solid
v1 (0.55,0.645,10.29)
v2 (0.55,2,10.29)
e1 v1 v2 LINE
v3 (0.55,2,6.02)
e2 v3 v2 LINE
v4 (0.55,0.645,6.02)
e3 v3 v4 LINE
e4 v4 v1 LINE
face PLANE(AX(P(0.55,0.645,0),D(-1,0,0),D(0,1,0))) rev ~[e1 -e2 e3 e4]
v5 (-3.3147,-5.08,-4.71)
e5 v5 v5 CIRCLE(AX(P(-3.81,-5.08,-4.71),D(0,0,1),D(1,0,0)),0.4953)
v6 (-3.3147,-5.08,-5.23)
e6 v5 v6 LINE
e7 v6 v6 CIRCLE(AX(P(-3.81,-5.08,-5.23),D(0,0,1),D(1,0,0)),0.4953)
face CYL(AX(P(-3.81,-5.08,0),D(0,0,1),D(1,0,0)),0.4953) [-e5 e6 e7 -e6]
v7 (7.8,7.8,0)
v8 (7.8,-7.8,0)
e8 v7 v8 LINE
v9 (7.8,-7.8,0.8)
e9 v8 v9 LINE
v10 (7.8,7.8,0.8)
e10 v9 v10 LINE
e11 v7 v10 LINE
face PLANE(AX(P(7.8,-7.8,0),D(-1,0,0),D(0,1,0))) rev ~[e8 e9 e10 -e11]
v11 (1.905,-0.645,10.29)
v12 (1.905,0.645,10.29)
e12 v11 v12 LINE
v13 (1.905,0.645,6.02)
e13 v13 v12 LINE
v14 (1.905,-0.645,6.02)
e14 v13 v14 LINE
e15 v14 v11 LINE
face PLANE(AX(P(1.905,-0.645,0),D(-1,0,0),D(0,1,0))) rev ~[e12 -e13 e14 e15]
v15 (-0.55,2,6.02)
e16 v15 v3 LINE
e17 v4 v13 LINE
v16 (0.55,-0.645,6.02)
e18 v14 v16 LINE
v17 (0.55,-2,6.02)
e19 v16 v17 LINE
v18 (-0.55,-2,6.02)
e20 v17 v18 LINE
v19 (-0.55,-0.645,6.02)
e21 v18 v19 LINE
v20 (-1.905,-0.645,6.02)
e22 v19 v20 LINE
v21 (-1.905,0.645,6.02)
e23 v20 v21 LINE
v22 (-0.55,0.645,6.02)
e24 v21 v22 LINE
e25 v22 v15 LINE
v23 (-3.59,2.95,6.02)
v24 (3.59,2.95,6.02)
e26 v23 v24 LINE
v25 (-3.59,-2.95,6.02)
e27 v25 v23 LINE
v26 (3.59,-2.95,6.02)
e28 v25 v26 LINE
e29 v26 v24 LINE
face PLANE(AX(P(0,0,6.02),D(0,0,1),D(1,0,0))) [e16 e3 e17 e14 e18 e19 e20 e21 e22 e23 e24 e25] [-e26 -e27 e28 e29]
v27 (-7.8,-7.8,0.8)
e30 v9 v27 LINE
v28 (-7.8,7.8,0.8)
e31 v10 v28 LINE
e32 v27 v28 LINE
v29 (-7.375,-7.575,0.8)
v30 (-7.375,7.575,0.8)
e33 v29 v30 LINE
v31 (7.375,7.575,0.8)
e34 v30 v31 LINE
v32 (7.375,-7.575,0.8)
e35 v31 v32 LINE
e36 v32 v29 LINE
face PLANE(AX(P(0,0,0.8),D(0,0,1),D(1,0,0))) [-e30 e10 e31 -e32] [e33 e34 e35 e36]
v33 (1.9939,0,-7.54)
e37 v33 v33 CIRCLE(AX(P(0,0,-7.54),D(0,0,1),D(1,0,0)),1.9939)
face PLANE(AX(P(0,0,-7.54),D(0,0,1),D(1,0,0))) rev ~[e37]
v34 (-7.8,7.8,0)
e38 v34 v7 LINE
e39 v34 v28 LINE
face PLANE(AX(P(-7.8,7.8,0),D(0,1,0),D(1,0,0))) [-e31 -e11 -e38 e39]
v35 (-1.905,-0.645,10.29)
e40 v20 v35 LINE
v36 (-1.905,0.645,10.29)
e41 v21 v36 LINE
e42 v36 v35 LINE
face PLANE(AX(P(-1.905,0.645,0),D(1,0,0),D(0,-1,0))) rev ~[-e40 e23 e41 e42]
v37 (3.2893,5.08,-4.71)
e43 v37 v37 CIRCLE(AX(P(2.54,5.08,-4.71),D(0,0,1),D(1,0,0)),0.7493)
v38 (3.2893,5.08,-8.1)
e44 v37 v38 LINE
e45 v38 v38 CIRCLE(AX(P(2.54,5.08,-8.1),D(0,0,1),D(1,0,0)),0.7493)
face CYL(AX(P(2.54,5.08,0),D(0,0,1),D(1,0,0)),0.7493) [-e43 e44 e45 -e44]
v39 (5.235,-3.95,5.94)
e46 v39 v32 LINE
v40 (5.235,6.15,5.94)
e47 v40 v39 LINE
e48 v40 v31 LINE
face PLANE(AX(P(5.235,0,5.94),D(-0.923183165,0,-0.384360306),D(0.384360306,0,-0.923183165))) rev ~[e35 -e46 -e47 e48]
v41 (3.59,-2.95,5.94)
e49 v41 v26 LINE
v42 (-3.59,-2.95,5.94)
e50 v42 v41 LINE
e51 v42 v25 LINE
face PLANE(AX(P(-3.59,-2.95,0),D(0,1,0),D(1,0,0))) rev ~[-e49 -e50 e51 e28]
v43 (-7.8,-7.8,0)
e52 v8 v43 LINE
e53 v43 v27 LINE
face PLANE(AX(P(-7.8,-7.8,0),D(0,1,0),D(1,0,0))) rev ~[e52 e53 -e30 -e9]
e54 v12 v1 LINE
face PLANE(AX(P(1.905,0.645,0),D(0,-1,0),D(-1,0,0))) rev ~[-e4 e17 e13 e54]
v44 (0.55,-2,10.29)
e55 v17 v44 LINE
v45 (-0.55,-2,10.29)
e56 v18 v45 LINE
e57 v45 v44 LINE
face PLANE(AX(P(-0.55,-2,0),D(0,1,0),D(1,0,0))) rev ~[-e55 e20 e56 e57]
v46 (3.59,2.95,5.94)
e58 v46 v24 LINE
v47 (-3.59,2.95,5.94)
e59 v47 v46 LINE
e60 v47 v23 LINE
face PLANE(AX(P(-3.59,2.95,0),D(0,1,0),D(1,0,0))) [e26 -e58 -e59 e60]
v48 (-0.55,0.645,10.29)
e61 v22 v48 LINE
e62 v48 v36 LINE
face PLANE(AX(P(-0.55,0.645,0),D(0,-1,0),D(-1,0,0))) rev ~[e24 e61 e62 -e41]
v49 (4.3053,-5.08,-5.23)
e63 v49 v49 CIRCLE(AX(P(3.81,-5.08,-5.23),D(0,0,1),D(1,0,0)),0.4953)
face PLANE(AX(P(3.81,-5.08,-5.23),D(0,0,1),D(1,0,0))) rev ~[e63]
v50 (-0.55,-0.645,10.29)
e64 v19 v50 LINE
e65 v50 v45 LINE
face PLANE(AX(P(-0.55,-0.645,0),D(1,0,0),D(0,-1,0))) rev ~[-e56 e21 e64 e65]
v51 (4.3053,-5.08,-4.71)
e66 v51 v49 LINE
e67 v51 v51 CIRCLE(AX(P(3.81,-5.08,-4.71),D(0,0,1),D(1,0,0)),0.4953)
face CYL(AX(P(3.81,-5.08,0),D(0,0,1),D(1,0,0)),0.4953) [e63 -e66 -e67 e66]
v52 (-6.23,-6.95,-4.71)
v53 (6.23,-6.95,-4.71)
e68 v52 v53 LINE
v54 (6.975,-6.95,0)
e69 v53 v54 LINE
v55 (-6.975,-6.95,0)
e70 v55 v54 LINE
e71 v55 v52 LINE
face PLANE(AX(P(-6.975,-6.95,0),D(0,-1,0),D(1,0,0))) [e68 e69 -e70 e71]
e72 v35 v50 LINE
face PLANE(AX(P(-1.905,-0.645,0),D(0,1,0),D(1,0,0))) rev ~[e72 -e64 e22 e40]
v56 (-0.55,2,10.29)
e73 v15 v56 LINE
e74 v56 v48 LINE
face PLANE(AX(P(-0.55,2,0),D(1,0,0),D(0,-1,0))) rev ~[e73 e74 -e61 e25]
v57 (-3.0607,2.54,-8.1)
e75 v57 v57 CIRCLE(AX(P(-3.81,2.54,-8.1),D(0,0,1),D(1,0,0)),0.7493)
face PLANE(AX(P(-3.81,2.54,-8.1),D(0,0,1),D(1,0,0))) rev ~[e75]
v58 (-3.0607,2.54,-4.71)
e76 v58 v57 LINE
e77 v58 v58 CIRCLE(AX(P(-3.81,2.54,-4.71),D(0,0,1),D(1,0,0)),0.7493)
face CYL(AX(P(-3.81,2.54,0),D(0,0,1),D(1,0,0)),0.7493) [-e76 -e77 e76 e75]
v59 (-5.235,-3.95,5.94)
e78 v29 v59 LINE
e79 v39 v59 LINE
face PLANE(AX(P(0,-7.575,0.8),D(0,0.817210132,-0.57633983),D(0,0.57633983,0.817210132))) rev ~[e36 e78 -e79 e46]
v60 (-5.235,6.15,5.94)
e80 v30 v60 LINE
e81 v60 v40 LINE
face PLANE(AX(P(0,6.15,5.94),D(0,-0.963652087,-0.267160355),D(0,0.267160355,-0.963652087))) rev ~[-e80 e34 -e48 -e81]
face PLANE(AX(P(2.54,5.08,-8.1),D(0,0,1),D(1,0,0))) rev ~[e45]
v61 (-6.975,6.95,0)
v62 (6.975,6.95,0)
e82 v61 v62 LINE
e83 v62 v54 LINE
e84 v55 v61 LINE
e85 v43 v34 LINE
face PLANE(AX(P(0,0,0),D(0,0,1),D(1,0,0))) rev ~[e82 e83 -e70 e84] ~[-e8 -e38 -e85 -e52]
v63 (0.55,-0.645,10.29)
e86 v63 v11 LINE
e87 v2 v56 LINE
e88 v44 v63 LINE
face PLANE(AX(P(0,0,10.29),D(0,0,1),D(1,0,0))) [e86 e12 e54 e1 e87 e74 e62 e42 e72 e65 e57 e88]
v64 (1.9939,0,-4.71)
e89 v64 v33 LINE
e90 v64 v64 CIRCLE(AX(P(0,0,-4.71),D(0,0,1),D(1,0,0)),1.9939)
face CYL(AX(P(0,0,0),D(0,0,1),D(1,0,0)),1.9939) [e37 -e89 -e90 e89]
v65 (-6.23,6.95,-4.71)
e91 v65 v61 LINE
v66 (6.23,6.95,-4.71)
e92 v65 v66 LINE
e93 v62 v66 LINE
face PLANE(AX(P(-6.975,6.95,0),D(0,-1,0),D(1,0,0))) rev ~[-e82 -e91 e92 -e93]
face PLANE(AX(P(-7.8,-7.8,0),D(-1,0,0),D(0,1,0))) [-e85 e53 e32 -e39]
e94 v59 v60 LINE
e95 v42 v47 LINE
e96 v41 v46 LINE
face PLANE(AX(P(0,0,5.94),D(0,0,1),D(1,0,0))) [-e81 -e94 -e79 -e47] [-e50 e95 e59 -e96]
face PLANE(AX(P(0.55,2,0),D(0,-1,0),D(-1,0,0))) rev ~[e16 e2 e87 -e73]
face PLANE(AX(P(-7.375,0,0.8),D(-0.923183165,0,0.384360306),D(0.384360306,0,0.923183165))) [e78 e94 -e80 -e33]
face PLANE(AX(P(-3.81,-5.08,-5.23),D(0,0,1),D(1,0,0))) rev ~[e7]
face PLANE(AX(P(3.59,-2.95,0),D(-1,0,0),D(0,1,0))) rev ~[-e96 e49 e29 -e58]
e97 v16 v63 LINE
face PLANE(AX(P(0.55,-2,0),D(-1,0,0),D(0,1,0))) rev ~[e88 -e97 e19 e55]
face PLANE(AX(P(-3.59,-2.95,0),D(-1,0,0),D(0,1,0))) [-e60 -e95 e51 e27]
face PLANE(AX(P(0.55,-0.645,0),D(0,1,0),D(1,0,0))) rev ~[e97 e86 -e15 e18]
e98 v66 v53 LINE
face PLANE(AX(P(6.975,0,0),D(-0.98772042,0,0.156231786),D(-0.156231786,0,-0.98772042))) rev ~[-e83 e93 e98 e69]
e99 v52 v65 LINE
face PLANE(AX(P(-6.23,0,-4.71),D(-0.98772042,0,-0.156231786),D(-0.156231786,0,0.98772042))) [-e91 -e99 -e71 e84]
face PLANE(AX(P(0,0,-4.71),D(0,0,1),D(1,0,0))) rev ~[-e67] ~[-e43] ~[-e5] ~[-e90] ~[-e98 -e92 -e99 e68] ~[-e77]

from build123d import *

# Parameters (mm, degrees)
F4_DEPTH       = 10.29
F1_W           = 7.18
F1_H           = 5.9
F5_DEPTH       = 6.02
F1_W_2         = 14.75
F1_H_2         = 15.15
F1_W_3         = 10.47
F1_H_3         = 10.1
F6_DEPTH       = 5.94
F1_W_4         = 15.6
F1_H_4         = 15.6
F7_DEPTH       = 0.8
F8_DEPTH       = 7.801
F8_DEPTH_BACK  = 7.801
F9_DEPTH       = 7.801
F9_DEPTH_BACK  = 7.801
F0_W           = 13.95
F0_H           = 13.9
F0_R           = 0.4953
F0_R_2         = 0.7493
F0_R_3         = 1.9939
F10_DEPTH      = 4.71
F11_DEPTH      = 7.54
F12_DEPTH      = 8.1
F13_DEPTH      = 5.23
F14_DEPTH      = 7.801
F14_DEPTH_BACK = 7.801


with BuildPart() as f4:
    # F1 (on Top) → F4 (new body, through all)
    with BuildSketch(Plane.XY):
        Polygon((0.55, 2), (-0.55, 2), (-0.55, 0.645), (-1.905, 0.645), (-1.905, -0.645), (-0.55, -0.645), (-0.55, -2), (0.55, -2), (0.55, -0.645), (1.905, -0.645), (1.905, 0.645), (0.55, 0.645), align=None)
    extrude(amount=F4_DEPTH)

    # F1 (on Top) → F5 (join, through all)
    with BuildSketch(Plane.XY):
        Rectangle(F1_W, F1_H)
        Polygon((-0.55, 0.645), (-0.55, 2), (0.55, 2), (0.55, 0.645), (1.905, 0.645), (1.905, -0.645), (0.55, -0.645), (0.55, -2), (-0.55, -2), (-0.55, -0.645), (-1.905, -0.645), (-1.905, 0.645), align=None, mode=Mode.SUBTRACT)
    extrude(amount=F5_DEPTH)

    # F1 (on Top) → F6 (join, through all)
    with BuildSketch(Plane.XY):
        Rectangle(F1_W_2, F1_H_2)
        with Locations((0, 1.1)):
            Rectangle(F1_W_3, F1_H_3, mode=Mode.SUBTRACT)
        with Locations((0, 1.1)):
            Rectangle(F1_W_3, F1_H_3)
        Rectangle(F1_W, F1_H, mode=Mode.SUBTRACT)
    extrude(amount=F6_DEPTH)

    # F1 (on Top) → F7 (join, through all)
    with BuildSketch(Plane.XY):
        Rectangle(F1_W_4, F1_H_4)
        Rectangle(F1_W_2, F1_H_2, mode=Mode.SUBTRACT)
    extrude(amount=F7_DEPTH)

    # F2 (on Right) → F8 (cut, two sides)
    with BuildSketch(Plane.YZ) as f8_sk:
        Polygon((-7.8, 5.94), (-7.8, 0.8), (-7.575, 0.8), (-3.95, 5.94), align=None)
        Polygon((6.15, 5.94), (7.575, 0.8), (7.8, 0.8), (7.8, 5.94), align=None)
    extrude(amount=-F8_DEPTH, mode=Mode.SUBTRACT)
    extrude(f8_sk.sketch, amount=F8_DEPTH_BACK, mode=Mode.SUBTRACT)

    # F3 (on Front) → F9 (cut, two sides)
    with BuildSketch(Plane.XZ) as f9_sk:
        Polygon((-7.8, 5.94), (-7.8, 0.8), (-7.375, 0.8), (-5.235, 5.94), align=None)
        Polygon((5.235, 5.94), (7.375, 0.8), (7.8, 0.8), (7.8, 5.94), align=None)
    extrude(amount=-F9_DEPTH, mode=Mode.SUBTRACT)
    extrude(f9_sk.sketch, amount=F9_DEPTH_BACK, mode=Mode.SUBTRACT)

    # F0 (on Top) → F10 (join, through all)
    with BuildSketch(Plane.XY):
        Rectangle(F0_W, F0_H)
        with Locations((-3.81, -5.08)):
            Circle(F0_R, mode=Mode.SUBTRACT)
        with Locations((3.81, -5.08)):
            Circle(F0_R, mode=Mode.SUBTRACT)
        with Locations((-3.81, 2.54)):
            Circle(F0_R_2, mode=Mode.SUBTRACT)
        Circle(F0_R_3, mode=Mode.SUBTRACT)
        with Locations((2.54, 5.08)):
            Circle(F0_R_2, mode=Mode.SUBTRACT)
    extrude(amount=-F10_DEPTH)

    # F0 (on Top) → F11 (join, through all)
    with BuildSketch(Plane.XY):
        Circle(F0_R_3)
    extrude(amount=-F11_DEPTH)

    # F0 (on Top) → F12 (join, through all)
    with BuildSketch(Plane.XY):
        with Locations((-3.81, 2.54)):
            Circle(F0_R_2)
        with Locations((2.54, 5.08)):
            Circle(F0_R_2)
    extrude(amount=-F12_DEPTH)

    # F0 (on Top) → F13 (join, through all)
    with BuildSketch(Plane.XY):
        with Locations((3.81, -5.08)):
            Circle(F0_R)
        with Locations((-3.81, -5.08)):
            Circle(F0_R)
    extrude(amount=-F13_DEPTH)

    # F3 (on Front) → F14 (cut, two sides)
    with BuildSketch(Plane.XZ) as f14_sk:
        Polygon((-6.975, 0), (-7.8, 0), (-7.8, -4.71), (-6.23, -4.71), align=None)
        Polygon((7.8, 0), (6.975, 0), (6.23, -4.71), (7.8, -4.71), align=None)
    extrude(amount=-F14_DEPTH, mode=Mode.SUBTRACT)
    extrude(f14_sk.sketch, amount=F14_DEPTH_BACK, mode=Mode.SUBTRACT)


solid = f4.part
